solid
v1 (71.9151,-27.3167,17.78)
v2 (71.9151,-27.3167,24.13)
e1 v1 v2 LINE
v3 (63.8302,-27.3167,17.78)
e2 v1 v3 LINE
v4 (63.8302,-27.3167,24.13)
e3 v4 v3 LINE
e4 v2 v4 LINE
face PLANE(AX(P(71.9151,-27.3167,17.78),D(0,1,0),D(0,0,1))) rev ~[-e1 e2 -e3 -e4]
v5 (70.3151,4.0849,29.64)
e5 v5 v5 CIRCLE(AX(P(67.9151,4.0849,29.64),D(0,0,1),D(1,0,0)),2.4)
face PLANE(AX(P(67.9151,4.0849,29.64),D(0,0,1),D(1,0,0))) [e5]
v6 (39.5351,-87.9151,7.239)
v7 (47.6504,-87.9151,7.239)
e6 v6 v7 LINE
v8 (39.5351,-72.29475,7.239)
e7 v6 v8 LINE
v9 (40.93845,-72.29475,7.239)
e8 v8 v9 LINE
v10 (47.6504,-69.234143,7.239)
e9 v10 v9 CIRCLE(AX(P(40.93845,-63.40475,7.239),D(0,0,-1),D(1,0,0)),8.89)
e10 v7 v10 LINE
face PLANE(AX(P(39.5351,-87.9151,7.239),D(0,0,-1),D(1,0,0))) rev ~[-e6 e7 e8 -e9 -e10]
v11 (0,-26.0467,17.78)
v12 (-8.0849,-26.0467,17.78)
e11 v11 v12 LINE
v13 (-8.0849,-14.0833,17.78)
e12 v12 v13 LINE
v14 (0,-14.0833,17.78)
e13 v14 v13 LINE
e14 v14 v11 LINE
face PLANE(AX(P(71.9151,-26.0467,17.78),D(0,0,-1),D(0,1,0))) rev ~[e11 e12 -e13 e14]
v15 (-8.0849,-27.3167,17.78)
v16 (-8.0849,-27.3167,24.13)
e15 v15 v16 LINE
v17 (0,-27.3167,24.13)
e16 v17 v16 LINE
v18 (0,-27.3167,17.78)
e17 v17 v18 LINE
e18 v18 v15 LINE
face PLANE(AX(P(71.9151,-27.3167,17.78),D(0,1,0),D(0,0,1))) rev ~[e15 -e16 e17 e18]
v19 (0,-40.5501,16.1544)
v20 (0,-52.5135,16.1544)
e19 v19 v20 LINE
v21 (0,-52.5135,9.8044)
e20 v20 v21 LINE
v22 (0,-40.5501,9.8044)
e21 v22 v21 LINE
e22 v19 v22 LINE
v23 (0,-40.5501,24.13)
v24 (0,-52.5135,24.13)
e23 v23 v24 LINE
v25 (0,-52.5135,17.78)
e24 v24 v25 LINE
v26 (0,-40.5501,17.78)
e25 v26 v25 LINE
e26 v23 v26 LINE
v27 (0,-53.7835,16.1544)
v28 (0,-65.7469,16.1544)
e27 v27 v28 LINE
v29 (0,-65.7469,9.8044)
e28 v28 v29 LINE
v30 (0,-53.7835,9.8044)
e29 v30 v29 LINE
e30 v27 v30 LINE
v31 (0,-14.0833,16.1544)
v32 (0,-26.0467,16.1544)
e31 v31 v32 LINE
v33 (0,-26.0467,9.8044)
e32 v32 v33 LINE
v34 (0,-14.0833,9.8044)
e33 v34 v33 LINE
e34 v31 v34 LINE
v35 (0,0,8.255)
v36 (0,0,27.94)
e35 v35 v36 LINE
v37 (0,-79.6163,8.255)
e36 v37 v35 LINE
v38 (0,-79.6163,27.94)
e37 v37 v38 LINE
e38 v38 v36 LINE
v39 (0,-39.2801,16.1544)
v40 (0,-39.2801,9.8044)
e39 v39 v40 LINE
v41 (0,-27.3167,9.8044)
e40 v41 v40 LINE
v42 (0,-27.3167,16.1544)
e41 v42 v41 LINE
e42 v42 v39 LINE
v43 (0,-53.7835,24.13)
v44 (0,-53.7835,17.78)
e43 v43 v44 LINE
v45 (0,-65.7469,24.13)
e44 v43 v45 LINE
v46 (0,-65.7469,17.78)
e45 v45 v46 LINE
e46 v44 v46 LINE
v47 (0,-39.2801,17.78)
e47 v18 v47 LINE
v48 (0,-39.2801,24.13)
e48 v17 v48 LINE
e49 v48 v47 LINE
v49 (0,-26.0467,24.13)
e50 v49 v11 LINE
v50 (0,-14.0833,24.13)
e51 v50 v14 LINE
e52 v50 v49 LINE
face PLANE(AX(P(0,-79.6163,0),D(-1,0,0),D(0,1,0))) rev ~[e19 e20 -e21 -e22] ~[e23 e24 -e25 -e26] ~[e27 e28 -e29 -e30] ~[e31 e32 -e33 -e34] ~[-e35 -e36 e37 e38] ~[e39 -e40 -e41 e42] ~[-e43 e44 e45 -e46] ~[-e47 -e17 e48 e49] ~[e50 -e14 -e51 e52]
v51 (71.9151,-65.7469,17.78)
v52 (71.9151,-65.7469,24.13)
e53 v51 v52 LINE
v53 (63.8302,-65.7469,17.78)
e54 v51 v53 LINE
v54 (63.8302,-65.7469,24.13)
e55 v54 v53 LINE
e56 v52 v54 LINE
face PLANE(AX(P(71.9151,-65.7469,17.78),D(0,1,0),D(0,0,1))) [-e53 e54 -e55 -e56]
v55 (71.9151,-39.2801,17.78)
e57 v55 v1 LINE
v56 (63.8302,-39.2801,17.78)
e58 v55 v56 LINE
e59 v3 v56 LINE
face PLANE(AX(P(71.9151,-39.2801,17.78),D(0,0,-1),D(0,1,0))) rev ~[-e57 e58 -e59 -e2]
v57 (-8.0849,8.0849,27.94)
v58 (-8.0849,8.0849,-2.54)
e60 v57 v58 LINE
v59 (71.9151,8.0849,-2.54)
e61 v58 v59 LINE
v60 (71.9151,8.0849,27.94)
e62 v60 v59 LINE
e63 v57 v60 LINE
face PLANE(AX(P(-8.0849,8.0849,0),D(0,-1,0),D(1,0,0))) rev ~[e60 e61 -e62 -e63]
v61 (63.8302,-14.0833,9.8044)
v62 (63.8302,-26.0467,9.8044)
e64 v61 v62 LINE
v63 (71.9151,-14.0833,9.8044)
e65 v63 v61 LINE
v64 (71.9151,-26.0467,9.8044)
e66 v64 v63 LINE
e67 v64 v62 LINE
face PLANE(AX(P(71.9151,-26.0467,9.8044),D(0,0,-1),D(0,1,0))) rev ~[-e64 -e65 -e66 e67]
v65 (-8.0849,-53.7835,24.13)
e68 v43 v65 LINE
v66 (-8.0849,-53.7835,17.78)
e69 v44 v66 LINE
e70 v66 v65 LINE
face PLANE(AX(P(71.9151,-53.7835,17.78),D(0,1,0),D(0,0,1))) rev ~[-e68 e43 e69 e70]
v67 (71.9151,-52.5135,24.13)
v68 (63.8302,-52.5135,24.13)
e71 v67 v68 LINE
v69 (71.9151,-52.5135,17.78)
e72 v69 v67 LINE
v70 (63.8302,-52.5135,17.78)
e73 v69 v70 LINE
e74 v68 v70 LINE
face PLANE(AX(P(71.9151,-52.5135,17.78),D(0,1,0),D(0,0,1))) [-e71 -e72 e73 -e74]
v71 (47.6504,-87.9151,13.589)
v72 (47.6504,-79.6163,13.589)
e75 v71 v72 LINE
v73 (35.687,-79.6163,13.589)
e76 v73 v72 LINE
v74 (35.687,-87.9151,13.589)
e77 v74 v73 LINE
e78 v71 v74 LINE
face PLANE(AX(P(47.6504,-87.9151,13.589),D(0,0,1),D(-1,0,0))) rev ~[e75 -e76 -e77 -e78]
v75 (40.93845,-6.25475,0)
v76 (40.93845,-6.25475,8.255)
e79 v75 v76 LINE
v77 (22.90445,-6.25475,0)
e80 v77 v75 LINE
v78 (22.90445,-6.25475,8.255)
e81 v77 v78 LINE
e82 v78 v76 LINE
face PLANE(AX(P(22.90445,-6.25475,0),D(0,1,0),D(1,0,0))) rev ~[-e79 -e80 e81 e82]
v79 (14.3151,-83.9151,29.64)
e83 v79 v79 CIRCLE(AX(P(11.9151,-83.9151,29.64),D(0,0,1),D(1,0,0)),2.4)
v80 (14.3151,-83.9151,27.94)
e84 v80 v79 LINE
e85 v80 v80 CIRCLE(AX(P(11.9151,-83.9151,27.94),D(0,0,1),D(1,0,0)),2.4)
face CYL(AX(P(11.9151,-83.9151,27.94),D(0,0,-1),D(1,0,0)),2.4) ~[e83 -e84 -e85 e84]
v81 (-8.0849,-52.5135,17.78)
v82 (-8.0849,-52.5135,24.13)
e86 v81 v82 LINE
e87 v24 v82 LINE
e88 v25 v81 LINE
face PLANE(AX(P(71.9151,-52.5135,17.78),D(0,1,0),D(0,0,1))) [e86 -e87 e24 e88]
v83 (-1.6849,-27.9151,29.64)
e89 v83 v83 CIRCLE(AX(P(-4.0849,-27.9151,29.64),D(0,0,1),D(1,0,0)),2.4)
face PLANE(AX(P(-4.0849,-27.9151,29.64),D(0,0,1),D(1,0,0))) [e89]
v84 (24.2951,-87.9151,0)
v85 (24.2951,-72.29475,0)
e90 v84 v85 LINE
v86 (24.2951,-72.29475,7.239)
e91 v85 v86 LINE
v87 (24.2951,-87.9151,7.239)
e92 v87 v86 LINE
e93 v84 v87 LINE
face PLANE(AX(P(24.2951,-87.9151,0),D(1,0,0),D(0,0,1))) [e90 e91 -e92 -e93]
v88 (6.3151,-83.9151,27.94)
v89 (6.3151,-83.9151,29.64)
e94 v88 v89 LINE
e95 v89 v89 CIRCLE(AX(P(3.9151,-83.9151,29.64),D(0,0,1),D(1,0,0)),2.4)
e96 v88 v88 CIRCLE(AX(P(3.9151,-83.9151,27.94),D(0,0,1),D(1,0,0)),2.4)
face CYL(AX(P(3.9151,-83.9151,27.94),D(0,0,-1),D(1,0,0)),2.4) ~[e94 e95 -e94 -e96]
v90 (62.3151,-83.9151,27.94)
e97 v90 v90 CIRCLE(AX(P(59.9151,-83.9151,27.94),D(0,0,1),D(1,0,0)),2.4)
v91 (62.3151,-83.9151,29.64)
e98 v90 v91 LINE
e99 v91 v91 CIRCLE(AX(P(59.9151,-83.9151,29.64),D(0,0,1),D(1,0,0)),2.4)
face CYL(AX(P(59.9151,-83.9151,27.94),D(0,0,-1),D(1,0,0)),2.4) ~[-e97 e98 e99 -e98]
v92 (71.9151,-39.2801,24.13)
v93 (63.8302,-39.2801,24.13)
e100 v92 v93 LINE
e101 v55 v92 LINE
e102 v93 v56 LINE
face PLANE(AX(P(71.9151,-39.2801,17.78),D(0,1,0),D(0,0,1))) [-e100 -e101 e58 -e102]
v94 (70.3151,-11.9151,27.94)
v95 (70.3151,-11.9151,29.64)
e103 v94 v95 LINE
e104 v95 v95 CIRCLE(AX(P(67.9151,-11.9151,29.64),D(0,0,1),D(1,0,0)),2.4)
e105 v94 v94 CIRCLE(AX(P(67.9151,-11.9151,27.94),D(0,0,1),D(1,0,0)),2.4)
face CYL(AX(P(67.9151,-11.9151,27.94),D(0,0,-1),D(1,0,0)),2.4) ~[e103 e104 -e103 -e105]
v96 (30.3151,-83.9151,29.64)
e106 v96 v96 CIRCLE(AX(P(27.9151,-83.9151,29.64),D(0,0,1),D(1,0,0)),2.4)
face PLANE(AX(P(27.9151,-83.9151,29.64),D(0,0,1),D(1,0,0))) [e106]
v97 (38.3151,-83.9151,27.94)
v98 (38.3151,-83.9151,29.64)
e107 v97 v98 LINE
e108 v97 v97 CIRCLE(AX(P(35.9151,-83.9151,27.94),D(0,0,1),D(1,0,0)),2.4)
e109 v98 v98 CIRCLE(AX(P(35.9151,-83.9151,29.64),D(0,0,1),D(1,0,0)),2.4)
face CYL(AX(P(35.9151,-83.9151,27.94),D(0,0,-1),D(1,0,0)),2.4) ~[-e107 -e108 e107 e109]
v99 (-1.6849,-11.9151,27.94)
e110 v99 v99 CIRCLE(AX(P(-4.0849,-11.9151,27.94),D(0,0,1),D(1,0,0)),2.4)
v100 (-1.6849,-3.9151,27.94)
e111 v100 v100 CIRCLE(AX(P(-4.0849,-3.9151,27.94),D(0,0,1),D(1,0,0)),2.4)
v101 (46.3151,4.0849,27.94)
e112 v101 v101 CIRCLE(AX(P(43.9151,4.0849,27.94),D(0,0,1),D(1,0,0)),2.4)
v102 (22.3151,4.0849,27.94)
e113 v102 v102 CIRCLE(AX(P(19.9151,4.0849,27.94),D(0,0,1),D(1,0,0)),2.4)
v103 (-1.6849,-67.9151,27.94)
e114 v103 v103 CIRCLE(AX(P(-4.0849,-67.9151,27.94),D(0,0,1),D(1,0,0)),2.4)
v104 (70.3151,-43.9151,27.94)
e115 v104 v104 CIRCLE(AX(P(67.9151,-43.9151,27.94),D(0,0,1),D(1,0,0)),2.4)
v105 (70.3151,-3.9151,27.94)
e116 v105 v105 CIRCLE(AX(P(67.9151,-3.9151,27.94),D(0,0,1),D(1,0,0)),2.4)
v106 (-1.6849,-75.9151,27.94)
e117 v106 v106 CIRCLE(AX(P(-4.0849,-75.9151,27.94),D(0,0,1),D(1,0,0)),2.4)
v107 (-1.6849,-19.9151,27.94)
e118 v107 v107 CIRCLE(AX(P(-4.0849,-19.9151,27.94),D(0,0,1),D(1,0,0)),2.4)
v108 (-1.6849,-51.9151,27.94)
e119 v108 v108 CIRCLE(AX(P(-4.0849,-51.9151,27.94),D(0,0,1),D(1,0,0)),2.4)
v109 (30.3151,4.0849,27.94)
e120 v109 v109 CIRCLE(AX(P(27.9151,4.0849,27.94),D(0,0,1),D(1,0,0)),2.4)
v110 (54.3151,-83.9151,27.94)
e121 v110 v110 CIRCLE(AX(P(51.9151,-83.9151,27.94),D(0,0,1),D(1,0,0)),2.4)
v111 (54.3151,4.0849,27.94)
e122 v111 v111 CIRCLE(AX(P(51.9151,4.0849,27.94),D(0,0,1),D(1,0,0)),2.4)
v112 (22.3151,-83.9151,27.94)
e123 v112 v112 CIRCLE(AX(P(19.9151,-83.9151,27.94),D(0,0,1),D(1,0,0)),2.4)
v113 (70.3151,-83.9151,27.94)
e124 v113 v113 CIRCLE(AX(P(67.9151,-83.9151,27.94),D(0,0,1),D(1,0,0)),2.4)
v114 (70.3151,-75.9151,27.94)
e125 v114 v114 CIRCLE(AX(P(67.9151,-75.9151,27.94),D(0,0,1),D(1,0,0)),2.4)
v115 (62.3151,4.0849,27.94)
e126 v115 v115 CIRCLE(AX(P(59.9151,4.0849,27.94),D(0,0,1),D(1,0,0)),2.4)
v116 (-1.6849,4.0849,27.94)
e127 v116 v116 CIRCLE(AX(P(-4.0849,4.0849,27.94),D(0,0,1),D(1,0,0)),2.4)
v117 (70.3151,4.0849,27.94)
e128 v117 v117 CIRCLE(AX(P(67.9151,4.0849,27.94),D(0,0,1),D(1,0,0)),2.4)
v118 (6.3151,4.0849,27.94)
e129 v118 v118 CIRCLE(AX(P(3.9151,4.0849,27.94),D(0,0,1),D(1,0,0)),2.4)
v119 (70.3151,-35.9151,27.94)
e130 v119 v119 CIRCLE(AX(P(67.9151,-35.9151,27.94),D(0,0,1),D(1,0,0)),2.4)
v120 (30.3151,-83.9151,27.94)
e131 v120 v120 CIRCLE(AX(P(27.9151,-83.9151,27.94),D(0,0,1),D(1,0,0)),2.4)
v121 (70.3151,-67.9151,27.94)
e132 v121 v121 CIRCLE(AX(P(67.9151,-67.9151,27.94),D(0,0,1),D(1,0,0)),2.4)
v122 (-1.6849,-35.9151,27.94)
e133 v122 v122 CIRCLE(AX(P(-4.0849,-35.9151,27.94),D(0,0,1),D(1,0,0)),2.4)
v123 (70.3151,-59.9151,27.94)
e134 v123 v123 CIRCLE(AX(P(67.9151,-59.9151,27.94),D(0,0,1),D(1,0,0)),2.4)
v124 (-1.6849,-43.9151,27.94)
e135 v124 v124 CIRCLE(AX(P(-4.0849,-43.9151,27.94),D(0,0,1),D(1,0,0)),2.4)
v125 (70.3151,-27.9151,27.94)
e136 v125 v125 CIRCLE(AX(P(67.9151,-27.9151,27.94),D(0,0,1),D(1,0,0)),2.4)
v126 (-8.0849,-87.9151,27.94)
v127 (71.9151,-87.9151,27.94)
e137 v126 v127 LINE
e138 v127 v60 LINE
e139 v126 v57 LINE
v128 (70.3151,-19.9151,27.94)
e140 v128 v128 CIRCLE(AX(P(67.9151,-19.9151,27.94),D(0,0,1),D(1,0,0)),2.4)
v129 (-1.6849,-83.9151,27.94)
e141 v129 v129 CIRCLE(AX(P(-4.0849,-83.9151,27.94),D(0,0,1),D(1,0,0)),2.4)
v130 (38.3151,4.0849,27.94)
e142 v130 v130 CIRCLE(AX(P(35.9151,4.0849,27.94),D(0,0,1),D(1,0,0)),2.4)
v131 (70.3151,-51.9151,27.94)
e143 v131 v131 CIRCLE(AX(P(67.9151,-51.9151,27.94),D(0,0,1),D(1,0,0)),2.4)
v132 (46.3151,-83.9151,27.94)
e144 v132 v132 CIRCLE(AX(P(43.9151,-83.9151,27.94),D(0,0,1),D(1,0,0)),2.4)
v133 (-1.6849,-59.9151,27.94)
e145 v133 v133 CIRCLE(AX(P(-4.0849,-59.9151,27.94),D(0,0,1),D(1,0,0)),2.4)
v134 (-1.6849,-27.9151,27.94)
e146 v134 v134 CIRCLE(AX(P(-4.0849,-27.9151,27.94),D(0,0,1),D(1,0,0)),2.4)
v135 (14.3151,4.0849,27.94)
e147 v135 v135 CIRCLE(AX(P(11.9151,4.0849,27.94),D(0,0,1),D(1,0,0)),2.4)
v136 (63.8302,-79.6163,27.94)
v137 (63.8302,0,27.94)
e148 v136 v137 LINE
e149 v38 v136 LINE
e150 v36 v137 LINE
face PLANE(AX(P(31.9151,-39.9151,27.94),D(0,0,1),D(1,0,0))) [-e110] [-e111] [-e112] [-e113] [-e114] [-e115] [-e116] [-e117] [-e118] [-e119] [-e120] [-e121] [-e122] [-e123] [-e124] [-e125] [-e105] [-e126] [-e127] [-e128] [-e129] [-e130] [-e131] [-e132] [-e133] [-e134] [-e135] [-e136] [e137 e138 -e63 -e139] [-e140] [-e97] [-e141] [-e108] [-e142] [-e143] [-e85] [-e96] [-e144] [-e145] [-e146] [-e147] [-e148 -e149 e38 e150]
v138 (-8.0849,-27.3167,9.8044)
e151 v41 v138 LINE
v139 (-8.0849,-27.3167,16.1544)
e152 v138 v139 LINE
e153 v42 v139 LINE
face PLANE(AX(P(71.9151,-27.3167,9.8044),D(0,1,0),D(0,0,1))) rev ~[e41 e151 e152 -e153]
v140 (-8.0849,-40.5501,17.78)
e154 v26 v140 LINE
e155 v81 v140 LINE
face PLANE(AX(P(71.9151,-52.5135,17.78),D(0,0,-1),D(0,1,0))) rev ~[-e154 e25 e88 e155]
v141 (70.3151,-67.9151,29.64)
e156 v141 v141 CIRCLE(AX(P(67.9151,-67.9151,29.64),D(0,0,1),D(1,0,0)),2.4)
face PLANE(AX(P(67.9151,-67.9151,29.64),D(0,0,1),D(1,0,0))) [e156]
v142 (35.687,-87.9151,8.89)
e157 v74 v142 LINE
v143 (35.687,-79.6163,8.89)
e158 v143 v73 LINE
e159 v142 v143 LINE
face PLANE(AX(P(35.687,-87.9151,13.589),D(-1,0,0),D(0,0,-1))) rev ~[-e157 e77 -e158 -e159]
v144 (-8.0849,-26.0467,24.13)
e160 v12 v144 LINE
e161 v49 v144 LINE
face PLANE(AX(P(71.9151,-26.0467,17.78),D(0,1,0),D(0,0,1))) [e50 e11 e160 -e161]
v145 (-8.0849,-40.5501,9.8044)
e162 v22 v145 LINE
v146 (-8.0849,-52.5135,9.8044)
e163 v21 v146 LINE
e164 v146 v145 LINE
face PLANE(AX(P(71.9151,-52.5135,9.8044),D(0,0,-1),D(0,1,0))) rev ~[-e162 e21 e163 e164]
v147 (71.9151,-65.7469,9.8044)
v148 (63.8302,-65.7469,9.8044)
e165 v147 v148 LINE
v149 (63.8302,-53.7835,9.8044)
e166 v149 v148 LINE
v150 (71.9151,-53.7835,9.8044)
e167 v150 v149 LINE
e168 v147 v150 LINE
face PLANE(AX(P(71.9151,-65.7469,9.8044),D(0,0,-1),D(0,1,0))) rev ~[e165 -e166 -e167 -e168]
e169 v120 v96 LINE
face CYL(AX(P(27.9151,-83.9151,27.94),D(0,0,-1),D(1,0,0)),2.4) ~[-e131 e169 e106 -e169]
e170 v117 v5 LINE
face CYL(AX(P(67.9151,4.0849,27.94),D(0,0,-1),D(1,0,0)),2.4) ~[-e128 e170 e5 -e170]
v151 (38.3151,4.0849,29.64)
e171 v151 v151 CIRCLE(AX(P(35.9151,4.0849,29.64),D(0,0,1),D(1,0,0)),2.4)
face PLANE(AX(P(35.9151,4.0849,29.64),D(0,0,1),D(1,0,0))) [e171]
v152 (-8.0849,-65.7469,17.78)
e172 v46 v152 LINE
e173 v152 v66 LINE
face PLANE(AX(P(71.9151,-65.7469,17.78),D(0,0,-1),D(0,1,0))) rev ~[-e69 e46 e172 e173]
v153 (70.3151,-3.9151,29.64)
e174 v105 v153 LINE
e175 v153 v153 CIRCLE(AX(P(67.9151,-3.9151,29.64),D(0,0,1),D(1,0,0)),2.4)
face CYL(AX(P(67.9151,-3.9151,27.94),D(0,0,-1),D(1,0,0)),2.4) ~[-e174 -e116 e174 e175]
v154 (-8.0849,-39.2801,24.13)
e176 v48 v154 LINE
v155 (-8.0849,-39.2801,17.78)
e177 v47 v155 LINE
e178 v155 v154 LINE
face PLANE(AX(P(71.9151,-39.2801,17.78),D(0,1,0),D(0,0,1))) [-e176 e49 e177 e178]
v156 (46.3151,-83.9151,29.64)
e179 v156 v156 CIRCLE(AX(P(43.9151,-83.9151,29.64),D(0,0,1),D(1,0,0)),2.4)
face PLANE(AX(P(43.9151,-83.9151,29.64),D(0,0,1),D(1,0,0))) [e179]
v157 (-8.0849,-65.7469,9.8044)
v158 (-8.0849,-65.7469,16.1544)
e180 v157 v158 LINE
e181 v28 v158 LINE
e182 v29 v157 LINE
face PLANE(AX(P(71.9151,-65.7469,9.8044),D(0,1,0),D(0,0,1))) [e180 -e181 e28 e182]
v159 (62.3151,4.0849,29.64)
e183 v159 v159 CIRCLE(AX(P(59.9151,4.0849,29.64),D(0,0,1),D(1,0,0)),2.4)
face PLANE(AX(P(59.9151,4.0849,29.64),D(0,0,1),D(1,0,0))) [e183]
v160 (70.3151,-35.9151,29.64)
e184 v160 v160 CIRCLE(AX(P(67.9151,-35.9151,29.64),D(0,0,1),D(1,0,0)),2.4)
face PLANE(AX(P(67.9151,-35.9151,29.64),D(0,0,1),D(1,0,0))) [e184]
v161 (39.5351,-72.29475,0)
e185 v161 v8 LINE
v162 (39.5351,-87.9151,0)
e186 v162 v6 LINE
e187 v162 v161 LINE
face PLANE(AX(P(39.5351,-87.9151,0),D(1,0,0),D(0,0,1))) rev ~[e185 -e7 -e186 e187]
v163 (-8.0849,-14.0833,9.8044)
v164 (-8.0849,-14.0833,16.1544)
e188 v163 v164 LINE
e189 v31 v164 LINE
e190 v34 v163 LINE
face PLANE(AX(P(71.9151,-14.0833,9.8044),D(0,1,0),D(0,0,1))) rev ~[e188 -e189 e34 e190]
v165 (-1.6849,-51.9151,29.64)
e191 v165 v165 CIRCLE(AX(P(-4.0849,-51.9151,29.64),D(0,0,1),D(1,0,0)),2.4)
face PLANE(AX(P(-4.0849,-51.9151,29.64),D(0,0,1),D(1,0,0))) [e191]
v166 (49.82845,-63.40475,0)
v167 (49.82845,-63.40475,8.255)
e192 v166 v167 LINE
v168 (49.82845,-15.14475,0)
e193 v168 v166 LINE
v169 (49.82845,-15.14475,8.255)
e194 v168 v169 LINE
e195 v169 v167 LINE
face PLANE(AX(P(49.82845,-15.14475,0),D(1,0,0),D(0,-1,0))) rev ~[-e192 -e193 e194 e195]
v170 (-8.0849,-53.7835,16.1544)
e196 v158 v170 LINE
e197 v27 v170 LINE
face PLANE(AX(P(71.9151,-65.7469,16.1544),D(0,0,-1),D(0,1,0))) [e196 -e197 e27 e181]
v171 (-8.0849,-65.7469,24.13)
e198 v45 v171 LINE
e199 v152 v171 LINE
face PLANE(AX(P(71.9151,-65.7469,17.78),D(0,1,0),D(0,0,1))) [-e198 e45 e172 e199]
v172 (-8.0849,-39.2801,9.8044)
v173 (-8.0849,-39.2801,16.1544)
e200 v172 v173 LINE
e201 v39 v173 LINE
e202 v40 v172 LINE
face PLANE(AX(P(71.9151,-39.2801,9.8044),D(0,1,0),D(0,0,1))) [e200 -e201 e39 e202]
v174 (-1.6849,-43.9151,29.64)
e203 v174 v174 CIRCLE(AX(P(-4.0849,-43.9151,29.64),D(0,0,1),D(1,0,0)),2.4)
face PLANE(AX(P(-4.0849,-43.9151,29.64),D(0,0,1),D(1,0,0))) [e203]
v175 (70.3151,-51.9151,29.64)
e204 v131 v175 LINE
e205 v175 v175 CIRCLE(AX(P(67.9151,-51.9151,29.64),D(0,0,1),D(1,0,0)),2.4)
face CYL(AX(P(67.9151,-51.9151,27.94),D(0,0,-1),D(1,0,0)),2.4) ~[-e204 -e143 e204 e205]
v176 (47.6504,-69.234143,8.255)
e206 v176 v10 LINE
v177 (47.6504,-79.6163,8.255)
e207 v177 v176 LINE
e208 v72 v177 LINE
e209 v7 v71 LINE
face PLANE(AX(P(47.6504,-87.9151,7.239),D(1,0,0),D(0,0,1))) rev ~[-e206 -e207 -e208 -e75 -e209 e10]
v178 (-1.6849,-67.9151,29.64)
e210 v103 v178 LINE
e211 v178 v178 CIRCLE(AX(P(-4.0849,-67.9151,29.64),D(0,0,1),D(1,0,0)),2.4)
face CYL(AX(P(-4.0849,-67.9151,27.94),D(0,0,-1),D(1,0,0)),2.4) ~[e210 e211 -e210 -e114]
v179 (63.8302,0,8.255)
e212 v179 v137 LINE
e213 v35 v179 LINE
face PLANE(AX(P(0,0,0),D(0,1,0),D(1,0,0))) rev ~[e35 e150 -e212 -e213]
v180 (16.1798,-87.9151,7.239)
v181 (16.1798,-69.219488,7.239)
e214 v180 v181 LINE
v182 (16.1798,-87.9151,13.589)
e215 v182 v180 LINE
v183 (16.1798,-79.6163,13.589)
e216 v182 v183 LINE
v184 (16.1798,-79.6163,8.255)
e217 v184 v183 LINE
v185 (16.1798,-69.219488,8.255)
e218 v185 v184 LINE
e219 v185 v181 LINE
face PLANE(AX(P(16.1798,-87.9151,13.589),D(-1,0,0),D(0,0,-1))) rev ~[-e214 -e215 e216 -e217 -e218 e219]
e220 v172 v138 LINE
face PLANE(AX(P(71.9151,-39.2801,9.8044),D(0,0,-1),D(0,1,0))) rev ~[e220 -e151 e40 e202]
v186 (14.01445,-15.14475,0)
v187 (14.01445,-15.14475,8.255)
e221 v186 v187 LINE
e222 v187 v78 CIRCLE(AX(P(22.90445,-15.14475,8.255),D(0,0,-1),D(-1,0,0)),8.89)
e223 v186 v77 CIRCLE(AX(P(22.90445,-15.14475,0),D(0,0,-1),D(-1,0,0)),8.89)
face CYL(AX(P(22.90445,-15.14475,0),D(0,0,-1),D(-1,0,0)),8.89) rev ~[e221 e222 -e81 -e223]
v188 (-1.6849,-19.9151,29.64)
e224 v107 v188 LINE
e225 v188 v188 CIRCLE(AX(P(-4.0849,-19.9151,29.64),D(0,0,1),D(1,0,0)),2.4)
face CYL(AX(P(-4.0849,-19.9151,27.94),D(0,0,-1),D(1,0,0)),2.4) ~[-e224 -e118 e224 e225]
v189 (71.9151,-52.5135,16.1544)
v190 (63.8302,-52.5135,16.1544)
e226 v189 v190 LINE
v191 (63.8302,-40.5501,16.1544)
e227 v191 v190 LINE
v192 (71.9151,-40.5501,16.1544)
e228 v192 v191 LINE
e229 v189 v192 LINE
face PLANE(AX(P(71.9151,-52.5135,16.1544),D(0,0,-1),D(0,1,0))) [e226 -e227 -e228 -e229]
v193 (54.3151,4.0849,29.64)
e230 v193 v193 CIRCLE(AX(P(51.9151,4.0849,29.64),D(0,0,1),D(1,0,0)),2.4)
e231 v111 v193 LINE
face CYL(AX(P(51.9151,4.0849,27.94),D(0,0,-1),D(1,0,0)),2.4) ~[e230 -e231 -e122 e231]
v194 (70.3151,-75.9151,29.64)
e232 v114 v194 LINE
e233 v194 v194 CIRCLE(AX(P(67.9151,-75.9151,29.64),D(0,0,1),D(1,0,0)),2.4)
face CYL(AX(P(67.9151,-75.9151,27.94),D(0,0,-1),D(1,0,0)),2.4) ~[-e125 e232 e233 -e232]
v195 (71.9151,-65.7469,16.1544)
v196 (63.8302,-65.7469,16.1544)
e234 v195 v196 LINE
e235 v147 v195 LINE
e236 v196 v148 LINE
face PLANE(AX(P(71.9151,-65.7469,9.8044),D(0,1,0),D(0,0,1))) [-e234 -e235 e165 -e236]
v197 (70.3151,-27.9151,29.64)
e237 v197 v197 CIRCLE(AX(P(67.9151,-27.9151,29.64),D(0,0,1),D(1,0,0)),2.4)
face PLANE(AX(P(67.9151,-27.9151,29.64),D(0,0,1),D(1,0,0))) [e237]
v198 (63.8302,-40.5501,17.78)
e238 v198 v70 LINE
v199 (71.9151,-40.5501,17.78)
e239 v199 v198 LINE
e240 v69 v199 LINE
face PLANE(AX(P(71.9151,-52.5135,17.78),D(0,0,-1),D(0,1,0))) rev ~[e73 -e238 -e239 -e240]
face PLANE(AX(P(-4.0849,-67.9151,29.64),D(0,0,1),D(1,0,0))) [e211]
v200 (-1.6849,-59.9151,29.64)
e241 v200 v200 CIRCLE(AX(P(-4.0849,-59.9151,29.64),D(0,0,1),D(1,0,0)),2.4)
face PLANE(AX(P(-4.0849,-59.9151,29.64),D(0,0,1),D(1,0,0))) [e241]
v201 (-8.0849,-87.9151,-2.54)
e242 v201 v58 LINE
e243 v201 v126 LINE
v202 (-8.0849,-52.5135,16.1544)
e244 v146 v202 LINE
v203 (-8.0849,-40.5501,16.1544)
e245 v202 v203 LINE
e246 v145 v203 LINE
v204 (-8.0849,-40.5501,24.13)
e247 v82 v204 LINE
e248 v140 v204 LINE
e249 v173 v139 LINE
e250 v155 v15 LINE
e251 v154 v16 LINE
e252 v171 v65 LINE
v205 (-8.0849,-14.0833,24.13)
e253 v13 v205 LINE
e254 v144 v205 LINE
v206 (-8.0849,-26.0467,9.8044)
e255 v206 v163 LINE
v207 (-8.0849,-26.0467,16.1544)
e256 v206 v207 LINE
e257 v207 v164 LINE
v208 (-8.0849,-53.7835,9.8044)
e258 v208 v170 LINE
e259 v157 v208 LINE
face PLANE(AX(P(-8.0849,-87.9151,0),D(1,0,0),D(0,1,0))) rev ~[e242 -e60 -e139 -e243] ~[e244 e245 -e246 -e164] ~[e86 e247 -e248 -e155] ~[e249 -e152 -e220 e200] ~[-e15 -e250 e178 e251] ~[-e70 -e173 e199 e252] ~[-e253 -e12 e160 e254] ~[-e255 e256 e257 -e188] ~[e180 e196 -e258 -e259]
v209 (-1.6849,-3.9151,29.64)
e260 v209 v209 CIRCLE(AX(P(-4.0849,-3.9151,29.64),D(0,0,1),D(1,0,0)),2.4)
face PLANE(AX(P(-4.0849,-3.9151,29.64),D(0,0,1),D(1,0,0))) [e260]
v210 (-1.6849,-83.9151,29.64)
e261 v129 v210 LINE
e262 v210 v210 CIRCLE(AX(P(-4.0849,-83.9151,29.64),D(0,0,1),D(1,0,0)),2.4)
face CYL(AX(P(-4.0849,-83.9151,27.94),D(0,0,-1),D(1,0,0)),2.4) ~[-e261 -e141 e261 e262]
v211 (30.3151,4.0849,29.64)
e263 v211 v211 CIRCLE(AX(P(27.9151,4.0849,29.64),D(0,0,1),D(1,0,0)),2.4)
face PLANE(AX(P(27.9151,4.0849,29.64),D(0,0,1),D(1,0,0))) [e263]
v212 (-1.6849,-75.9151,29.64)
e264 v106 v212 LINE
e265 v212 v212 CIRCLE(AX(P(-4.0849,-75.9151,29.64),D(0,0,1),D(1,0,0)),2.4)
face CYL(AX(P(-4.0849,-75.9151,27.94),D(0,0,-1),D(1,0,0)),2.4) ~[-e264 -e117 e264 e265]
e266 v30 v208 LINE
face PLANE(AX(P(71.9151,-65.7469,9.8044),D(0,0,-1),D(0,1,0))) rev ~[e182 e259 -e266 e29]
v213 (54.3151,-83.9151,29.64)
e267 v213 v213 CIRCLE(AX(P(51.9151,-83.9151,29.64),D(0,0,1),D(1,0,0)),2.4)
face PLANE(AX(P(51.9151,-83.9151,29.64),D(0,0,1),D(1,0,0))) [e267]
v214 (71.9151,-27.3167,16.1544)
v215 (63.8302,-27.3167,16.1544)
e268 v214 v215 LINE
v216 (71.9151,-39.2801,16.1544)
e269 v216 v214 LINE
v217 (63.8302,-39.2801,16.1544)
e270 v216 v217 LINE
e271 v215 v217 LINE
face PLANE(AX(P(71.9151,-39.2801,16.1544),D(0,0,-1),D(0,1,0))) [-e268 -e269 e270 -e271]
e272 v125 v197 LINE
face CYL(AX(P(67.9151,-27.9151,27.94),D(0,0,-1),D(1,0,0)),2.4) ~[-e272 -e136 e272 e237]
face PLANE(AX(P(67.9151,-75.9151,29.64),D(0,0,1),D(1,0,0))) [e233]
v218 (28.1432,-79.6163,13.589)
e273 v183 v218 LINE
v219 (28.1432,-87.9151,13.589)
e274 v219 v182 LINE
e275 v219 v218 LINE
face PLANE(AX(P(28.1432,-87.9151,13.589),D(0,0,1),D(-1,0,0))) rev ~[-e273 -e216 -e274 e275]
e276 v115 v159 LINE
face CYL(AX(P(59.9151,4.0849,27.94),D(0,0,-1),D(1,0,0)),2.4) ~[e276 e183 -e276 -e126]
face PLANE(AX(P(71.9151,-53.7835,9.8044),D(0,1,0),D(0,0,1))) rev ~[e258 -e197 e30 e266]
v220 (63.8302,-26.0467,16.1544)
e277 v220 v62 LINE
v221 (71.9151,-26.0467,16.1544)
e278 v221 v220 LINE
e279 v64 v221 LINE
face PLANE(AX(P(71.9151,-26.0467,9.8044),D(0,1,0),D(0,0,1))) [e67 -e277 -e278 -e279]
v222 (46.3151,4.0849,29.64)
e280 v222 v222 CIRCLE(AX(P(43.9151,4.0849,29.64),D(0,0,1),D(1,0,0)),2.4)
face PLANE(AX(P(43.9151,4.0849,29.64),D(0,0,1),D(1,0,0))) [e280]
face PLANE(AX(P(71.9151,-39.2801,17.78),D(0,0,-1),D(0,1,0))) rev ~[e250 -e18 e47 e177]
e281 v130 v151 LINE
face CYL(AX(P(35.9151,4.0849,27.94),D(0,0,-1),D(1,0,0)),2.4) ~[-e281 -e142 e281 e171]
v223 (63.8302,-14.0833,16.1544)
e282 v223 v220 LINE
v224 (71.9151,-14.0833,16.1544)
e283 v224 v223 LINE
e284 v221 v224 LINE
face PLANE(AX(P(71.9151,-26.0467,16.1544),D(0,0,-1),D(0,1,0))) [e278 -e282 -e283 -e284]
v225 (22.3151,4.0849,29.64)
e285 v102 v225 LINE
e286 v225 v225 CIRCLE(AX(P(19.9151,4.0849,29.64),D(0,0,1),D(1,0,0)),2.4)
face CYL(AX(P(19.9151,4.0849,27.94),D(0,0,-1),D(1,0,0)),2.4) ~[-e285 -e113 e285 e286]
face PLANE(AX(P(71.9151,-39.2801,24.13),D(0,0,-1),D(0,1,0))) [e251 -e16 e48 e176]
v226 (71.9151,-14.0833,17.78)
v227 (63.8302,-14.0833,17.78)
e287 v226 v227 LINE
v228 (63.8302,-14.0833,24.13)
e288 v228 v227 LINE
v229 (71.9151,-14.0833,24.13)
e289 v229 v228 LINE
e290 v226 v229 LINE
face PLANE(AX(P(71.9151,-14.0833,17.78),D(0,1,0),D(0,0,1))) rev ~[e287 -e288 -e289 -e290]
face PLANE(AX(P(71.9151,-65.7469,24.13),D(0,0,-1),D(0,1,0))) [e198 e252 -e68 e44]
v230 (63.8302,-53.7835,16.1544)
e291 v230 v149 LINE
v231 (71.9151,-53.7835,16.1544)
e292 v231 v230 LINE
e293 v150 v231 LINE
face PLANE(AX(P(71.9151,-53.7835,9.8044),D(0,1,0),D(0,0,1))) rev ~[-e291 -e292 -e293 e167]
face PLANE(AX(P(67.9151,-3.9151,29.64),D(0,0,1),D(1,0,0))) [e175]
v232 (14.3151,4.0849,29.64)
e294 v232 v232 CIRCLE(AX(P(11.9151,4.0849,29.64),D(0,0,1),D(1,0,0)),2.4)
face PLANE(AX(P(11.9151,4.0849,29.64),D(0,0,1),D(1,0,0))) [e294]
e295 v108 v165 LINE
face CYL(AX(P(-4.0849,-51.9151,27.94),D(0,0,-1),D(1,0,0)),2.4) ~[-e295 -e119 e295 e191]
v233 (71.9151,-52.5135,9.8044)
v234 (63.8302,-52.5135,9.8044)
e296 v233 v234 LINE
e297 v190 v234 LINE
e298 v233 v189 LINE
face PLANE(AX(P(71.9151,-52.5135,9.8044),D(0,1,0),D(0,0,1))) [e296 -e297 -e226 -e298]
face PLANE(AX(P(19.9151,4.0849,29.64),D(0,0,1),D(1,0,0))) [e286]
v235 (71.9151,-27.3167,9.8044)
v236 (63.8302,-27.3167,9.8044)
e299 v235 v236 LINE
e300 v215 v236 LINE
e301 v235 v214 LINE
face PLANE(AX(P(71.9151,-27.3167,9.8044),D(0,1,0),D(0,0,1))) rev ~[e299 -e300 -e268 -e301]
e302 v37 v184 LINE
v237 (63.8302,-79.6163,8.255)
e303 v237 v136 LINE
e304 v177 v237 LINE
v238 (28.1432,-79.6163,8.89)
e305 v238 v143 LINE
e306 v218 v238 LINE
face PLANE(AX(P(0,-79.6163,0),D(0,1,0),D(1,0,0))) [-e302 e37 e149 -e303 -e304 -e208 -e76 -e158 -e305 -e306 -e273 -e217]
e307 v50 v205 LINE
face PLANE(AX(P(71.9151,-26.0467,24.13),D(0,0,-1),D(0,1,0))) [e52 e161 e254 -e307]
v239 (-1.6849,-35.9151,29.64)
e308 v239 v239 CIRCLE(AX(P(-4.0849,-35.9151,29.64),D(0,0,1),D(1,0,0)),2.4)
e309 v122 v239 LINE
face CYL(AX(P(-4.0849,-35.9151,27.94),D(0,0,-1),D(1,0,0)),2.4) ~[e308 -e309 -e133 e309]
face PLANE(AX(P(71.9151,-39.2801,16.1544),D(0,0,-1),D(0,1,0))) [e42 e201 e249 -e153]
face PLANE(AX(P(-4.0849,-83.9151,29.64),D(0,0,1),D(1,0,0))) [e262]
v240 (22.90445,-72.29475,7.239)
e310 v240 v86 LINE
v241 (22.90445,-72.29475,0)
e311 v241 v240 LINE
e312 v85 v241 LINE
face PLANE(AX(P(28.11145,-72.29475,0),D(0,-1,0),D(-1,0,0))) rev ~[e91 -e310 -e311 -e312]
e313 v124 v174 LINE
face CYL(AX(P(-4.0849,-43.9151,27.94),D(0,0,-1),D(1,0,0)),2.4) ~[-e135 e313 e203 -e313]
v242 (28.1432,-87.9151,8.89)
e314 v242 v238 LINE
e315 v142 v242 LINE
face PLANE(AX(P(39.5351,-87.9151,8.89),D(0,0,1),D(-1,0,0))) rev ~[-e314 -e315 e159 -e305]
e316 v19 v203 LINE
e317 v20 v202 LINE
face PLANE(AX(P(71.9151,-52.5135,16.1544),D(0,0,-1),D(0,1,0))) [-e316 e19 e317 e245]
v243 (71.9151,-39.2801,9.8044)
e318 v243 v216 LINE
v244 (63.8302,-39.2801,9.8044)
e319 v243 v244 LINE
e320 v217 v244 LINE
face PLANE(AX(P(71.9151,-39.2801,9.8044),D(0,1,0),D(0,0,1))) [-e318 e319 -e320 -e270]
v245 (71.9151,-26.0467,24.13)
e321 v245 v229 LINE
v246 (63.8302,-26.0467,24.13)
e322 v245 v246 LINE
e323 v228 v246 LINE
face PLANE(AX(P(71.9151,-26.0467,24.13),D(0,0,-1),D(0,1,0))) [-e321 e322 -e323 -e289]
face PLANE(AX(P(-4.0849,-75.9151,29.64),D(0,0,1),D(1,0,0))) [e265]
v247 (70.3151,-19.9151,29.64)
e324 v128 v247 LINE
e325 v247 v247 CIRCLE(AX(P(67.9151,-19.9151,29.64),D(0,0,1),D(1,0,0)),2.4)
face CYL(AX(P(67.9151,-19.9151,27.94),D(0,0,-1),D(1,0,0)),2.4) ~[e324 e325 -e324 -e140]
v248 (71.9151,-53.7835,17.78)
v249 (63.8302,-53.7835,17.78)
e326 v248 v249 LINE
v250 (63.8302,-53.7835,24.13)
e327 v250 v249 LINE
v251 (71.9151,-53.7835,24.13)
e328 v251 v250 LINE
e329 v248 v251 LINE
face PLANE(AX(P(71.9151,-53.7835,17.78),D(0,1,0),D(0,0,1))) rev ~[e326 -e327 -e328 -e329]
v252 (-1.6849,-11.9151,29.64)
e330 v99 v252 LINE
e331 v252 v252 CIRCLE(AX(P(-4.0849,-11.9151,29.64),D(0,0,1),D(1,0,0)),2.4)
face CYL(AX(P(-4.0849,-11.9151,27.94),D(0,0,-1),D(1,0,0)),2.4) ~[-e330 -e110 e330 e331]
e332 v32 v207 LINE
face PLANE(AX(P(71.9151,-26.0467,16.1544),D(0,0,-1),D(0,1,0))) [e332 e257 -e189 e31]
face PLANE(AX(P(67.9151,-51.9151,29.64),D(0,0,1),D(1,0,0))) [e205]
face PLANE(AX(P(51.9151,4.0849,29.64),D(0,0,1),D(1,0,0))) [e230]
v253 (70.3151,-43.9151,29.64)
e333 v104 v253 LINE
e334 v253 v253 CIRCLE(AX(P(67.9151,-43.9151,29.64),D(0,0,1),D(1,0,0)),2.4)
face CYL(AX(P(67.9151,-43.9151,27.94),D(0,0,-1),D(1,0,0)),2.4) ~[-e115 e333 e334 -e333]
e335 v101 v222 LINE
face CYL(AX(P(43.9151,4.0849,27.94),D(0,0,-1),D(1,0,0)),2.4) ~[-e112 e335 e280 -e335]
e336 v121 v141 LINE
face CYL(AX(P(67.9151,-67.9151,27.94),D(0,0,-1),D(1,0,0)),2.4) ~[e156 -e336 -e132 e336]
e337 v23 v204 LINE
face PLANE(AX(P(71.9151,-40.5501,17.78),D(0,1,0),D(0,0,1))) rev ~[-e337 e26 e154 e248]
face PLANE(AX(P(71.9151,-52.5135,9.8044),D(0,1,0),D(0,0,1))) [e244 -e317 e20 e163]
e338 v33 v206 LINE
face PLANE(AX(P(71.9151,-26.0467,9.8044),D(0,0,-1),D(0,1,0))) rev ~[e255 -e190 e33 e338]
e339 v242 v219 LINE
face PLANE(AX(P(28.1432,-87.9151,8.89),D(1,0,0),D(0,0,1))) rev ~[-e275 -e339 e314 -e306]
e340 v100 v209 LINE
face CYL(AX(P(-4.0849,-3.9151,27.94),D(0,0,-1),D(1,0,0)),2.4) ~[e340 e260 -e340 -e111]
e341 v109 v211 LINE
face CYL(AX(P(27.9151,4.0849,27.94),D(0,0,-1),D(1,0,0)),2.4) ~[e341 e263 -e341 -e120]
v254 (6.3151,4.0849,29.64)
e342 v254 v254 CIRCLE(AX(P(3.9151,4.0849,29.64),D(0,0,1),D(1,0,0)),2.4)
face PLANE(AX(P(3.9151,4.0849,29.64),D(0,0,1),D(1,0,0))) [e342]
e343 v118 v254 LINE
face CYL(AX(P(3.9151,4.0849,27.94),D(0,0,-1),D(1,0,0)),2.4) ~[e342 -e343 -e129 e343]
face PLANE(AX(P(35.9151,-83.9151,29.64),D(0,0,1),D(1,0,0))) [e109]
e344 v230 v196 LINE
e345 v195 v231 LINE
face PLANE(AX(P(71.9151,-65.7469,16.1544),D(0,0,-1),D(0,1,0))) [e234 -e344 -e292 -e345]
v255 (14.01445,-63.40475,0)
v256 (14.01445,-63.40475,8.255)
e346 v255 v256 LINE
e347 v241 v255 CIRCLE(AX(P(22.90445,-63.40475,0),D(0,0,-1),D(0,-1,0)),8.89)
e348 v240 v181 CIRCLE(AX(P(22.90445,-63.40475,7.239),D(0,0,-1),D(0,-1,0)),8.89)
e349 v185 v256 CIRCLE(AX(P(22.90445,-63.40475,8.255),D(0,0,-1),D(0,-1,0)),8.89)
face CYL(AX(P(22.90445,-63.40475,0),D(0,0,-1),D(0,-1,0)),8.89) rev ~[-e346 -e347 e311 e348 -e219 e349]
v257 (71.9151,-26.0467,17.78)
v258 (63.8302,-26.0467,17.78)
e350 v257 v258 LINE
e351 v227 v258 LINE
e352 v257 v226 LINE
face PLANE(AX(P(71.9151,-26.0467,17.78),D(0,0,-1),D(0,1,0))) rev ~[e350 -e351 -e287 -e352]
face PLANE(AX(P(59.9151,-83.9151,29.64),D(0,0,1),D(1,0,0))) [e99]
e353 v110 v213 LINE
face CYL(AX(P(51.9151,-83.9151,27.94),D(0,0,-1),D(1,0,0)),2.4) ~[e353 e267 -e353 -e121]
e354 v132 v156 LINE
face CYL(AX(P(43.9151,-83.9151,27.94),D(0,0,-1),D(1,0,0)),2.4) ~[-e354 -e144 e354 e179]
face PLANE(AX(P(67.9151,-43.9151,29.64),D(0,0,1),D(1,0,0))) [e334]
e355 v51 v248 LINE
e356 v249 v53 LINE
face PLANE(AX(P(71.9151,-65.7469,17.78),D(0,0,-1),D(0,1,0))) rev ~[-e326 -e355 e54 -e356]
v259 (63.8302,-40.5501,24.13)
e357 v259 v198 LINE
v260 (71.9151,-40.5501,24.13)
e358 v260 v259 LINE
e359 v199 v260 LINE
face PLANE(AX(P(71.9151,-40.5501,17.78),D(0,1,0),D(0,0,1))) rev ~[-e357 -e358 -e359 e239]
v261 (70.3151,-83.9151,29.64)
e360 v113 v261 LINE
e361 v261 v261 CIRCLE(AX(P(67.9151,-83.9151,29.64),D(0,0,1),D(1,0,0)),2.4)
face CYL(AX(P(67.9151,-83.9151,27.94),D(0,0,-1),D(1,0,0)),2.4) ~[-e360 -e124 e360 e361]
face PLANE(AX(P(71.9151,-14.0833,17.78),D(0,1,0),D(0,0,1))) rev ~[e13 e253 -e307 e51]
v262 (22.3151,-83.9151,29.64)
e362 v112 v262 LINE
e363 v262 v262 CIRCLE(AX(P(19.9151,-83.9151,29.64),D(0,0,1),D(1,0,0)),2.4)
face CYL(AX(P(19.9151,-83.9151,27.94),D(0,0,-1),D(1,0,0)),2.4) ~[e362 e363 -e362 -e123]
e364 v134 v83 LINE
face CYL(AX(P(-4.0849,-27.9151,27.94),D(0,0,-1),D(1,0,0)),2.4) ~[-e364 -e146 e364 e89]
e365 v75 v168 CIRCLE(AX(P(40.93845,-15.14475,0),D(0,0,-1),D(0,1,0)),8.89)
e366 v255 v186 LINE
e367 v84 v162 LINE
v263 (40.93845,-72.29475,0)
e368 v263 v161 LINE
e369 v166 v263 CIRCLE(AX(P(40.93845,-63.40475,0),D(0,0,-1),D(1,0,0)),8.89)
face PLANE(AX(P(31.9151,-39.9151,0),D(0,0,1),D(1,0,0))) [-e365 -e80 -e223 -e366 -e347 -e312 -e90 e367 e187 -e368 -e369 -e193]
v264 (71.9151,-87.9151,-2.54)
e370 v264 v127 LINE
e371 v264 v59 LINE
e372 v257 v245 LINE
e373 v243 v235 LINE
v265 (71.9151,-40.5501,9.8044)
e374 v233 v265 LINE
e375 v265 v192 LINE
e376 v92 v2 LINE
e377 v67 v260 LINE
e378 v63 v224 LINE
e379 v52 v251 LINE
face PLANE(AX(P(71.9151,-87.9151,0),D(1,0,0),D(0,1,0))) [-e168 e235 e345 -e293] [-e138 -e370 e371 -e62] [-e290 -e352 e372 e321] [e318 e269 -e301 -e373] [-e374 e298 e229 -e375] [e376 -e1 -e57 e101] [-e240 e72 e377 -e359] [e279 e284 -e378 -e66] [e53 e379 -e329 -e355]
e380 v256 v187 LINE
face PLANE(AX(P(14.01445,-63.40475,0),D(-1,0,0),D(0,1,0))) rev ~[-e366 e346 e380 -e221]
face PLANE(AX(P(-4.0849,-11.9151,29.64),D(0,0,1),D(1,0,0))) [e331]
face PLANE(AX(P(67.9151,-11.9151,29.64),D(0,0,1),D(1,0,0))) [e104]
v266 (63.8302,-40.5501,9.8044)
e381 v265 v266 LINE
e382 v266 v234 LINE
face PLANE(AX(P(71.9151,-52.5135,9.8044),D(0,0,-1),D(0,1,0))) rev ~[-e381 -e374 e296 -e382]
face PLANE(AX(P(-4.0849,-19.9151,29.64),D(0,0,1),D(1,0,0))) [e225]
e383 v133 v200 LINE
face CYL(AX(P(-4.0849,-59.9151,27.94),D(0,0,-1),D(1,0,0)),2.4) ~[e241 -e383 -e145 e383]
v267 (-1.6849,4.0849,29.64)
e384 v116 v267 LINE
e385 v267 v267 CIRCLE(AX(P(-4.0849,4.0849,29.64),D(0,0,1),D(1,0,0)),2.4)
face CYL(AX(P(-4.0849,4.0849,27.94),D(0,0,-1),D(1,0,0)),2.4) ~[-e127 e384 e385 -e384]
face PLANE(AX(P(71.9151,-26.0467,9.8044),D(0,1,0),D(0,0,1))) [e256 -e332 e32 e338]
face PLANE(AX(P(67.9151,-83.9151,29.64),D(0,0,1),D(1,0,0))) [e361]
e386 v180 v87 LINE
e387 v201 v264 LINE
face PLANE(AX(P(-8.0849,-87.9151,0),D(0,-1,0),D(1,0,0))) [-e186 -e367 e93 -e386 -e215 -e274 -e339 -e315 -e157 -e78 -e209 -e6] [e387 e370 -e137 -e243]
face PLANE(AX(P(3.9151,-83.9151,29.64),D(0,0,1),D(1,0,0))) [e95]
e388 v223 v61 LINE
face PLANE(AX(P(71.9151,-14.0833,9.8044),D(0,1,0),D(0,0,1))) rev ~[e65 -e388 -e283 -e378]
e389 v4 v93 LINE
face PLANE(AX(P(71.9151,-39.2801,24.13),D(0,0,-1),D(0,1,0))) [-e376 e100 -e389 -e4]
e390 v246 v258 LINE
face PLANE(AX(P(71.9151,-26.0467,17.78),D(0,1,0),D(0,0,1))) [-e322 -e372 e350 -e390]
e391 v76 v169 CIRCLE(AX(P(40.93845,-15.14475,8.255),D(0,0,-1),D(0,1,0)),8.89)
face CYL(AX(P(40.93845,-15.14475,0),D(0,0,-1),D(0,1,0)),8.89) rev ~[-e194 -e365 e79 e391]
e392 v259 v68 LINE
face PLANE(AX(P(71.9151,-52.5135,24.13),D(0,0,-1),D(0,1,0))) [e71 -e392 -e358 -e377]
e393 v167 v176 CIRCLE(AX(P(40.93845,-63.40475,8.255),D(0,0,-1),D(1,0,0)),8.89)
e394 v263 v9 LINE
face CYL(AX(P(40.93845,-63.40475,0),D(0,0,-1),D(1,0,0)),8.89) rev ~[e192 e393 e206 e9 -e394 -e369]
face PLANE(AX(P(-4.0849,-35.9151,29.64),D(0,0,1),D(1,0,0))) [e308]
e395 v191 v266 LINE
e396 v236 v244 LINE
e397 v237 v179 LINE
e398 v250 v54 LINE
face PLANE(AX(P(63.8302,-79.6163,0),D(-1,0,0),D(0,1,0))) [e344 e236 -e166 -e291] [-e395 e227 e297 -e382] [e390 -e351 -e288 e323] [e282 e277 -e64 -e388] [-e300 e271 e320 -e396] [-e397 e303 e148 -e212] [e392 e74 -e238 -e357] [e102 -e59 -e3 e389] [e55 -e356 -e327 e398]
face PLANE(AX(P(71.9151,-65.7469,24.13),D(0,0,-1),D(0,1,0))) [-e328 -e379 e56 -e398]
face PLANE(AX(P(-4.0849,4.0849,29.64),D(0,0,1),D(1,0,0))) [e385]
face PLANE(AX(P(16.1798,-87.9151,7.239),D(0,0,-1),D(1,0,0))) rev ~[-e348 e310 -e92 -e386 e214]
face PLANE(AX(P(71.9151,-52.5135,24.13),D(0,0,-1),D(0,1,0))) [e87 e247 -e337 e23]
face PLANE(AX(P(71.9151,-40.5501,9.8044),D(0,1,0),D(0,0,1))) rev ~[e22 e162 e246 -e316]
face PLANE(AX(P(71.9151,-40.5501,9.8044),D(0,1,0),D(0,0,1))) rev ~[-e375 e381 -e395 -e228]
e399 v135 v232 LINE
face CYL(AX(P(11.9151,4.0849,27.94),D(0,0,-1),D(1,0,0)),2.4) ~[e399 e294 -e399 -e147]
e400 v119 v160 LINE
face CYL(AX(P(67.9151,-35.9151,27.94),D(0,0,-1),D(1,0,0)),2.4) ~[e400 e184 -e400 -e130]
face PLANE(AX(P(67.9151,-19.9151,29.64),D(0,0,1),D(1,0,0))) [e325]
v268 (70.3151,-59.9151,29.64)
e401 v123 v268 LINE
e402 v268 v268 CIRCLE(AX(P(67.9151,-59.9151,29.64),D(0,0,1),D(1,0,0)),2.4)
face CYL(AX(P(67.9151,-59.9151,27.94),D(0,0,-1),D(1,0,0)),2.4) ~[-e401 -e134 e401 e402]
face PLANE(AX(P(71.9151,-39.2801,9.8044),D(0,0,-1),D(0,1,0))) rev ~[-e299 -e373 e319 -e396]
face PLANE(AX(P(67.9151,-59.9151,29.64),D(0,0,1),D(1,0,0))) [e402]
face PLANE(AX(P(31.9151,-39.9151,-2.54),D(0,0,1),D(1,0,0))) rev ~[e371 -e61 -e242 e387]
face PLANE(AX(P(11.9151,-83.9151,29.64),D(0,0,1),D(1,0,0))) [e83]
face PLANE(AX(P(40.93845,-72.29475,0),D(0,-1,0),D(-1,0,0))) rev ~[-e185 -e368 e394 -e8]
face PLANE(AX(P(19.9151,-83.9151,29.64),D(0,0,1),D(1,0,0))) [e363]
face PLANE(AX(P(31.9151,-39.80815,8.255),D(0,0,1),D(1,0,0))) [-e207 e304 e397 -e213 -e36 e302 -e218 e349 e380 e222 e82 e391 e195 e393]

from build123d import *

# Parameters (mm, degrees)
F0_W      = 80
F0_H      = 96
F0_W_2    = 63.8302
F0_H_2    = 79.6163
F1_DEPTH  = 27.94
F2_W      = 80
F2_H      = 96
F2_W_2    = 63.8302
F2_H_2    = 79.6163
F3_DEPTH  = 2.54
F4_W      = 63.8302
F4_H      = 79.6163
F5_DEPTH  = 8.255
F6_W      = 7.62
F6_H      = 8.89
F7_DEPTH  = 25.4
F9_DEPTH  = 19.05
F10_W     = 11.9634
F10_H     = 6.35
F11_DEPTH = 127
F12_R     = 2.4
F13_DEPTH = 1.7


# Not quite as in the source:
# - a feature names something its author has since deleted; it is built from what else it names


with BuildPart() as f1:
    # F0 (on Top) → F1 (new body)
    with BuildSketch(Plane.XY):
        with Locations((31.9151, -39.9151)):
            Rectangle(F0_W, F0_H)
        with Locations((31.9151, -39.80815)):
            Rectangle(F0_W_2, F0_H_2, mode=Mode.SUBTRACT)
    extrude(amount=F1_DEPTH)

    # F2 (on Top) → F3 (join)
    with BuildSketch(Plane.XY):
        with Locations((31.9151, -39.9151)):
            Rectangle(F2_W, F2_H)
        with Locations((31.9151, -39.80815)):
            Rectangle(F2_W_2, F2_H_2, mode=Mode.SUBTRACT)
        with Locations((31.9151, -39.80815)):
            Rectangle(F2_W_2, F2_H_2)
    extrude(amount=-F3_DEPTH)

    # F4 (on face) → F5 (join)
    with BuildSketch(Plane.XY):
        with Locations((31.9151, -39.80815)):
            Rectangle(F4_W, F4_H)
        with BuildLine():
            ThreePointArc((14.01445, -15.14475), (16.6182707153, -8.8585707153), (22.90445, -6.25475))
            Line((22.90445, -6.25475), (40.93845, -6.25475))
            ThreePointArc((40.93845, -6.25475), (47.2246292847, -8.8585707153), (49.82845, -15.14475))
            Line((49.82845, -15.14475), (49.82845, -63.40475))
            ThreePointArc((49.82845, -63.40475), (47.2246292847, -69.6909292847), (40.93845, -72.29475))
            Line((40.93845, -72.29475), (35.73145, -72.29475))
            Line((35.73145, -72.29475), (35.73145, -73.81875))
            Line((35.73145, -73.81875), (32.30245, -73.81875))
            Line((32.30245, -73.81875), (31.92145, -73.81875))
            Line((31.92145, -73.81875), (28.11145, -73.81875))
            Line((28.11145, -73.81875), (28.11145, -72.29475))
            Line((28.11145, -72.29475), (22.90445, -72.29475))
            ThreePointArc((22.90445, -72.29475), (16.6182707153, -69.6909292847), (14.01445, -63.40475))
            Line((14.01445, -63.40475), (14.01445, -15.14475))
        make_face(mode=Mode.SUBTRACT)
    extrude(amount=F5_DEPTH)

    # F6 (on face) → F7 (cut)
    with BuildSketch(Plane.XZ.offset(87.9151)):
        Polygon((39.5351, 8.89), (31.9151, 8.89), (31.9151, 0), (36.9951, 0), (39.5351, 0), align=None)
        with Locations((28.1051, 4.445)):
            Rectangle(F6_W, F6_H)
    extrude(amount=-F7_DEPTH, mode=Mode.SUBTRACT)

    # F8 (on face) → F9 (cut)
    with BuildSketch(Plane.XZ.offset(87.9151)):
        Polygon((28.1432, 13.589), (16.1798, 13.589), (16.1798, 7.239), (24.2951, 7.239), (24.2951, 8.89), (28.1432, 8.89), align=None)
        Polygon((35.687, 13.589), (35.687, 8.89), (39.5351, 8.89), (39.5351, 7.239), (47.6504, 7.239), (47.6504, 13.589), align=None)
    extrude(amount=-F9_DEPTH, mode=Mode.SUBTRACT)

    # F10 (on face) → F11 (cut)
    with BuildSketch(Plane.YZ.offset(71.9151)):
        with Locations((-33.2984, 20.955)):
            Rectangle(F10_W, F10_H)
        with Locations((-20.065, 20.955)):
            Rectangle(F10_W, F10_H)
        with Locations((-46.5318, 20.955)):
            Rectangle(F10_W, F10_H)
        with Locations((-59.7652, 20.955)):
            Rectangle(F10_W, F10_H)
        with Locations((-20.065, 12.9794)):
            Rectangle(F10_W, F10_H)
        with Locations((-33.2984, 12.9794)):
            Rectangle(F10_W, F10_H)
        with Locations((-46.5318, 12.9794)):
            Rectangle(F10_W, F10_H)
        with Locations((-59.7652, 12.9794)):
            Rectangle(F10_W, F10_H)
    extrude(amount=-F11_DEPTH, mode=Mode.SUBTRACT)

    # F12 (on face) → F13 (join)
    with BuildSketch(Plane.XY.offset(27.94)):
        with Locations((-4.0849, -83.9151)):
            Circle(F12_R)
        with Locations((3.9151, -83.9151)):
            Circle(F12_R)
        with Locations((11.9151, -83.9151)):
            Circle(F12_R)
        with Locations((19.9151, -83.9151)):
            Circle(F12_R)
        with Locations((27.9151, -83.9151)):
            Circle(F12_R)
        with Locations((35.9151, -83.9151)):
            Circle(F12_R)
        with Locations((43.9151, -83.9151)):
            Circle(F12_R)
        with Locations((51.9151, -83.9151)):
            Circle(F12_R)
        with Locations((67.9151, -83.9151)):
            Circle(F12_R)
        with Locations((59.9151, -83.9151)):
            Circle(F12_R)
        with Locations((67.9151, -75.9151)):
            Circle(F12_R)
        with Locations((67.9151, -67.9151)):
            Circle(F12_R)
        with Locations((67.9151, -59.9151)):
            Circle(F12_R)
        with Locations((67.9151, -51.9151)):
            Circle(F12_R)
        with Locations((67.9151, -43.9151)):
            Circle(F12_R)
        with Locations((67.9151, -35.9151)):
            Circle(F12_R)
        with Locations((67.9151, -27.9151)):
            Circle(F12_R)
        with Locations((67.9151, -19.9151)):
            Circle(F12_R)
        with Locations((67.9151, -11.9151)):
            Circle(F12_R)
        with Locations((67.9151, -3.9151)):
            Circle(F12_R)
        with Locations((-4.0849, -75.9151)):
            Circle(F12_R)
        with Locations((-4.0849, -67.9151)):
            Circle(F12_R)
        with Locations((-4.0849, -59.9151)):
            Circle(F12_R)
        with Locations((-4.0849, -51.9151)):
            Circle(F12_R)
        with Locations((-4.0849, -43.9151)):
            Circle(F12_R)
        with Locations((-4.0849, -35.9151)):
            Circle(F12_R)
        with Locations((-4.0849, -27.9151)):
            Circle(F12_R)
        with Locations((-4.0849, -19.9151)):
            Circle(F12_R)
        with Locations((-4.0849, -11.9151)):
            Circle(F12_R)
        with Locations((-4.0849, -3.9151)):
            Circle(F12_R)
        with Locations((-4.0849, 4.0849)):
            Circle(F12_R)
        with Locations((3.9151, 4.0849)):
            Circle(F12_R)
        with Locations((11.9151, 4.0849)):
            Circle(F12_R)
        with Locations((19.9151, 4.0849)):
            Circle(F12_R)
        with Locations((27.9151, 4.0849)):
            Circle(F12_R)
        with Locations((59.9151, 4.0849)):
            Circle(F12_R)
        with Locations((51.9151, 4.0849)):
            Circle(F12_R)
        with Locations((43.9151, 4.0849)):
            Circle(F12_R)
        with Locations((35.9151, 4.0849)):
            Circle(F12_R)
        with Locations((67.9151, 4.0849)):
            Circle(F12_R)
    extrude(amount=F13_DEPTH)


solid = f1.part
